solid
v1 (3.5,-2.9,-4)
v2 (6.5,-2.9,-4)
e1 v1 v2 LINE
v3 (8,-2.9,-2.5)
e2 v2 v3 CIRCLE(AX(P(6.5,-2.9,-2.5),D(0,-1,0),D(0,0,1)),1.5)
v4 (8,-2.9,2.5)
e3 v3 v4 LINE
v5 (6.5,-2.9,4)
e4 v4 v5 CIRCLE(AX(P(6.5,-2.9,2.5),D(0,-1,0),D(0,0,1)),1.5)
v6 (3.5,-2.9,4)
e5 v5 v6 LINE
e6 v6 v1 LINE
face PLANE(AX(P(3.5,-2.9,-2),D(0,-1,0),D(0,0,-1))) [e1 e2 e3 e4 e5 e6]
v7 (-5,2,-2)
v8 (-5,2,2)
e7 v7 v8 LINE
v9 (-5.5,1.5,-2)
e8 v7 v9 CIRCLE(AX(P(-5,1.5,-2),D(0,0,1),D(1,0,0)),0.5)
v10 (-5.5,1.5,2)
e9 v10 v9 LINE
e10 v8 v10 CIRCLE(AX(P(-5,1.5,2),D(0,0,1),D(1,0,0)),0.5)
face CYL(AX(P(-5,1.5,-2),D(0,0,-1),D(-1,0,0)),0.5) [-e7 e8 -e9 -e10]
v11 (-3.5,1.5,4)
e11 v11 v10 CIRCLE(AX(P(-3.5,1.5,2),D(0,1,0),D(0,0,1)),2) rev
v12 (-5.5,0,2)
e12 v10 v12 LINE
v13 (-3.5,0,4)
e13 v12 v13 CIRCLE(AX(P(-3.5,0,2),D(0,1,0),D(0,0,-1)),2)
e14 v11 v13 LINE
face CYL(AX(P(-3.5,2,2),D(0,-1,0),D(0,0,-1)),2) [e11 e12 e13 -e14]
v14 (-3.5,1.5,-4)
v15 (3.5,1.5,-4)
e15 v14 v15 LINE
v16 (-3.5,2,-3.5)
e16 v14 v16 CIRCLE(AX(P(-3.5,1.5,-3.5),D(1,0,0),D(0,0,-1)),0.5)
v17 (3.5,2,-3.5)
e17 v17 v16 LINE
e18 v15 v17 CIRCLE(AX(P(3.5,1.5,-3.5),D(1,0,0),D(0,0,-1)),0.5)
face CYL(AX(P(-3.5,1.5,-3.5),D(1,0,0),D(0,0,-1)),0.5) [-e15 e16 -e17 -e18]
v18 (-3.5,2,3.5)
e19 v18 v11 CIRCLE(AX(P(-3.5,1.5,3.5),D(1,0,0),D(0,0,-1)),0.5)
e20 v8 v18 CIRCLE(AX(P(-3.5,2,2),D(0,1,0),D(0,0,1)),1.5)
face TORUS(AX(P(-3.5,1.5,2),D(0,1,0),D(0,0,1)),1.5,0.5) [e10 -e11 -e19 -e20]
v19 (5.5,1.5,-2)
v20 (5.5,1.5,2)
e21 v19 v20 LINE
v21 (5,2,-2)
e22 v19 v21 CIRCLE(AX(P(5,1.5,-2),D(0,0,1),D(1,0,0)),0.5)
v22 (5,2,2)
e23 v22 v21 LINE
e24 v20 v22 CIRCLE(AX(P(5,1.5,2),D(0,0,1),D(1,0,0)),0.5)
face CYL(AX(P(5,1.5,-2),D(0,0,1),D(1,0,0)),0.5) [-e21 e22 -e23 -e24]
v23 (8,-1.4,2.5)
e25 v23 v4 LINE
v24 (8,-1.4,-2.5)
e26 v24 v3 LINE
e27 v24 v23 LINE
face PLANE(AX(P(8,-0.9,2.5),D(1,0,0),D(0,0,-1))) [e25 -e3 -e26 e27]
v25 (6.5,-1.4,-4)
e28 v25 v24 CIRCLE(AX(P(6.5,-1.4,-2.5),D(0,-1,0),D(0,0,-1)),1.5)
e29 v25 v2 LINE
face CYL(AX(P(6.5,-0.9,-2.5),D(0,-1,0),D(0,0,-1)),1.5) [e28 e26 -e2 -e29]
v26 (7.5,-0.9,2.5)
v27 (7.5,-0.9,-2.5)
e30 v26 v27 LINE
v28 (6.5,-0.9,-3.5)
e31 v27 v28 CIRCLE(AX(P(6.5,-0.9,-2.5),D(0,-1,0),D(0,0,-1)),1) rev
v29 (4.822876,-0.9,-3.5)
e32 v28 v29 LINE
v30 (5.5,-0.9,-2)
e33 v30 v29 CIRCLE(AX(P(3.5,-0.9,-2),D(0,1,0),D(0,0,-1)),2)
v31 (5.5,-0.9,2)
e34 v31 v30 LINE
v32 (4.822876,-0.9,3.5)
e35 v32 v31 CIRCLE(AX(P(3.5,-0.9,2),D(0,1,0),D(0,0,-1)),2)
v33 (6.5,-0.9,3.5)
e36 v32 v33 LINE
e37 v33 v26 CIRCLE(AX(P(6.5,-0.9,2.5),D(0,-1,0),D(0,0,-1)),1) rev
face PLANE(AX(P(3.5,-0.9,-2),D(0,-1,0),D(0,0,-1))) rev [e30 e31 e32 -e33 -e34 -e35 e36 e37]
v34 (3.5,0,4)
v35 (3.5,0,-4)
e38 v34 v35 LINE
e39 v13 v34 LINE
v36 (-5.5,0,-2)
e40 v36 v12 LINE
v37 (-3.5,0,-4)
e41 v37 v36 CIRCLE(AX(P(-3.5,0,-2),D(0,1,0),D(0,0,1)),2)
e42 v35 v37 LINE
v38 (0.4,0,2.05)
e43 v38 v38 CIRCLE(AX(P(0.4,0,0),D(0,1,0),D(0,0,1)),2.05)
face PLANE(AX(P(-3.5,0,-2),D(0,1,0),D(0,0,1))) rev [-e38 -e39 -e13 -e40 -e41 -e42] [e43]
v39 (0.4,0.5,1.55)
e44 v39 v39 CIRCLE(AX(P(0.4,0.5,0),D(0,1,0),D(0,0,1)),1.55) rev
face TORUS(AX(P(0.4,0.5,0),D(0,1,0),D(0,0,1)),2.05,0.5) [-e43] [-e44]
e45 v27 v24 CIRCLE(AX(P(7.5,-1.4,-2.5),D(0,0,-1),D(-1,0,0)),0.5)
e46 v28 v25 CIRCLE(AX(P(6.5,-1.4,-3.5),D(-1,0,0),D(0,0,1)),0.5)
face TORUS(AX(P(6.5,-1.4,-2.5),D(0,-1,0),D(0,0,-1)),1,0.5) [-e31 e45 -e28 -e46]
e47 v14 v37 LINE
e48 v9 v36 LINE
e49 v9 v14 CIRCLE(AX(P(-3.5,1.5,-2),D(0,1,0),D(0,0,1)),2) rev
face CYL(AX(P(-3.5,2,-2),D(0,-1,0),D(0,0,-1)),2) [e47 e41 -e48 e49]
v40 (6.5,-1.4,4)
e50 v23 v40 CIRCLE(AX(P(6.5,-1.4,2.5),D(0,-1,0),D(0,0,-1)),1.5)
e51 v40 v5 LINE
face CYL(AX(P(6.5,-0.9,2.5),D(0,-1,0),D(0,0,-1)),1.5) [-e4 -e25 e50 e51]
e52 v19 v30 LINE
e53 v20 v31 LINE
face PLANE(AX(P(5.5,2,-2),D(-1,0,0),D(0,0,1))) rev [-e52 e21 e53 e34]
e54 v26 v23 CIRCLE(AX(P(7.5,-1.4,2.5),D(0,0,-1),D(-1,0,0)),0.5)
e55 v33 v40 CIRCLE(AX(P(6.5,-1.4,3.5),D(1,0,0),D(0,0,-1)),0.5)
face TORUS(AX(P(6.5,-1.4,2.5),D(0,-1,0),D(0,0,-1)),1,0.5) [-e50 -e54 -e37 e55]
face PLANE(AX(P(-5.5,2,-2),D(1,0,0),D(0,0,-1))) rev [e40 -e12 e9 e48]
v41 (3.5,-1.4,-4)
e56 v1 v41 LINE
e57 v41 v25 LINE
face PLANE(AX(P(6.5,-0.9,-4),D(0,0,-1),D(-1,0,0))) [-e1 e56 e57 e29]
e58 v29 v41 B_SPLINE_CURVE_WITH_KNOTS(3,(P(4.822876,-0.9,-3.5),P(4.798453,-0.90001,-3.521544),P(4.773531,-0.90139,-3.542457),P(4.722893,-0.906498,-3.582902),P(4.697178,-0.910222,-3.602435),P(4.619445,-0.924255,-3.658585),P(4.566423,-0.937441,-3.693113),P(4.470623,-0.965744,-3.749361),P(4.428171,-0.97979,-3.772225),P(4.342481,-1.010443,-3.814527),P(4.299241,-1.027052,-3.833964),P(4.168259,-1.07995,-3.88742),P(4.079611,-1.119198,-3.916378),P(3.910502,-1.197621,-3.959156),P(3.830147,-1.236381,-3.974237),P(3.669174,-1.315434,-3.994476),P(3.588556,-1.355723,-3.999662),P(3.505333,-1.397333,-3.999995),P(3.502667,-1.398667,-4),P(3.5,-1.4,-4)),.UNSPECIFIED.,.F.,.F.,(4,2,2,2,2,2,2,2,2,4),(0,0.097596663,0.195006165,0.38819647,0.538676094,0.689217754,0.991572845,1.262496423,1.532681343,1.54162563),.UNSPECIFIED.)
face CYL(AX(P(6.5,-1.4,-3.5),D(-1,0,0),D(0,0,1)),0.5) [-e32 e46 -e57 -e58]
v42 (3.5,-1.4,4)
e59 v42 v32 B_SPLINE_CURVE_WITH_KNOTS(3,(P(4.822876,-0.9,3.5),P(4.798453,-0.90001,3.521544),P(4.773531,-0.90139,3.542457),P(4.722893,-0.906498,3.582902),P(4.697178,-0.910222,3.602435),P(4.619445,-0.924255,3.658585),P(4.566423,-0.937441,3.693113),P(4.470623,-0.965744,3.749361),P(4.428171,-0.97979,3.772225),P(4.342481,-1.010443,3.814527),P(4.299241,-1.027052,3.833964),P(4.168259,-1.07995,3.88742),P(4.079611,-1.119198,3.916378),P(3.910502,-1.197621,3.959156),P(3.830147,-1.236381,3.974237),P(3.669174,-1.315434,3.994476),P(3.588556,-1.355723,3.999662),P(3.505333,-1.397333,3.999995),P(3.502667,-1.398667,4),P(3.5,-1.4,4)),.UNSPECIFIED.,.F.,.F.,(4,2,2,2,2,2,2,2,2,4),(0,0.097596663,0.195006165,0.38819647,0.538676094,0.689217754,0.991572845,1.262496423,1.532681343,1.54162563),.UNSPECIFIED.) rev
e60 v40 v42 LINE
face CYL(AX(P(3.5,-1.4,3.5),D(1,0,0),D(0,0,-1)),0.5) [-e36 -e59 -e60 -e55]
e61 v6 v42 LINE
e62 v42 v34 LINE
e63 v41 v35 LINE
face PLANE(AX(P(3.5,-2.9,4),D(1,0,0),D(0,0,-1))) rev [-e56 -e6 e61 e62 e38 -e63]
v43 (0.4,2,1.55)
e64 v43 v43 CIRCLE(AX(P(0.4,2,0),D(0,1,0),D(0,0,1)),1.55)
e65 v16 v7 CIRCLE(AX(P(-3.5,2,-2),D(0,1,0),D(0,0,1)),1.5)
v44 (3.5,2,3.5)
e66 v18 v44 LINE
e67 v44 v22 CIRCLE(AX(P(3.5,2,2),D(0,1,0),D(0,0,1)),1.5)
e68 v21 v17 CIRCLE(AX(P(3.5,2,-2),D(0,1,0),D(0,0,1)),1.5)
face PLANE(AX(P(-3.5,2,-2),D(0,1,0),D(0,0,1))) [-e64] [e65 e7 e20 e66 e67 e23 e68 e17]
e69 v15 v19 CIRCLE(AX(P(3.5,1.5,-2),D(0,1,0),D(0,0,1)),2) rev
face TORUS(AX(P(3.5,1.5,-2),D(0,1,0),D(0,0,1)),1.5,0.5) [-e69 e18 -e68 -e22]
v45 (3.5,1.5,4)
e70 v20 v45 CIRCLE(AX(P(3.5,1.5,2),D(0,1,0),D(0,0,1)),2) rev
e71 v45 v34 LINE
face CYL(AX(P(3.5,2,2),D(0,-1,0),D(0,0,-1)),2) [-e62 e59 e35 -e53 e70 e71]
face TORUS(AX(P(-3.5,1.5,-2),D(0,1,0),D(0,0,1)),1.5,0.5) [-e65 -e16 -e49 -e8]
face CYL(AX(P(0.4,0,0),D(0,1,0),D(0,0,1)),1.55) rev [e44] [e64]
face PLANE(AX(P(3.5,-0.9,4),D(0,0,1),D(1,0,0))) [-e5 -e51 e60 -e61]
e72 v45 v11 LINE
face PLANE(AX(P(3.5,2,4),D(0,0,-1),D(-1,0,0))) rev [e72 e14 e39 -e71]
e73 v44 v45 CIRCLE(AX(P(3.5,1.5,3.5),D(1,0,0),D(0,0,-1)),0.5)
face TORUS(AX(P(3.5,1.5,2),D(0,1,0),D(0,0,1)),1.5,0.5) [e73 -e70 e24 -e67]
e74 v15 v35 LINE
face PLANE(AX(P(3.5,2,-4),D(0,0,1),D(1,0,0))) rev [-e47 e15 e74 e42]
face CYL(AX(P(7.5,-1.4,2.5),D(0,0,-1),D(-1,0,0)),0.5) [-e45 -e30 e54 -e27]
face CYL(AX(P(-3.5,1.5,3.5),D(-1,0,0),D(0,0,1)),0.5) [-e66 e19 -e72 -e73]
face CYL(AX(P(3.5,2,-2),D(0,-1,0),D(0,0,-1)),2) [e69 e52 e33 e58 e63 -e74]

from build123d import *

# Parameters (mm, degrees)
BOSS_EXTRUDE1_DEPTH     = 2
CUT_EXTRUDE1_DEPTH      = 8.088723439
CUT_EXTRUDE1_DEPTH_BACK = 8.088723439
SKETCH2_R               = 1.55
BOSS_EXTRUDE2_START     = 2.9
BOSS_EXTRUDE2_DEPTH     = 2.9
BOSS_EXTRUDE3_DEPTH     = 2
FILLET1_R               = 0.5


with BuildPart() as part:
    # Sketch1 → Boss-Extrude1 (new body)
    with BuildSketch(Plane(origin=(0, 0, 0), x_dir=(1, 0, 0), z_dir=(0, 1, 0))):
        with BuildLine():
            Line((3.5, 4), (-3.5, 4))
            ThreePointArc((-3.5, 4), (-4.914213562, 3.414213562), (-5.5, 2))
            Line((-5.5, 2), (-5.5, -2))
            ThreePointArc((-5.5, -2), (-4.914213562, -3.414213562), (-3.5, -4))
            Line((-3.5, -4), (3.5, -4))
            ThreePointArc((3.5, -4), (4.914213562, -3.414213562), (5.5, -2))
            Line((5.5, -2), (5.5, 2))
            ThreePointArc((5.5, 2), (4.914213562, 3.414213562), (3.5, 4))
        make_face()
    extrude(amount=BOSS_EXTRUDE1_DEPTH)

    # Sketch2 → Cut-Extrude1 (cut, two sides: drawn at the far end of the back side and taken through both)
    with BuildSketch(Plane(origin=(0, 2, 0), x_dir=(1, 0, 0), z_dir=(0, 1, 0)).offset(-CUT_EXTRUDE1_DEPTH_BACK)):
        with Locations(Location((0.4, 0, 0), (0, 0, 270))):
            Circle(SKETCH2_R)
    extrude(amount=CUT_EXTRUDE1_DEPTH + CUT_EXTRUDE1_DEPTH_BACK, mode=Mode.SUBTRACT)

    # Sketch3 → Boss-Extrude2 (add)
    with BuildSketch(Plane.XZ.offset(BOSS_EXTRUDE2_START)):
        with BuildLine():
            Line((5.5, 2), (5.5, -2))
            ThreePointArc((5.5, -2), (4.914213562, -3.414213562), (3.5, -4))
            Line((3.5, -4), (3.5, 4))
            ThreePointArc((3.5, 4), (4.914213562, 3.414213562), (5.5, 2))
        make_face()
    extrude(amount=-BOSS_EXTRUDE2_DEPTH)

    # Sketch4 → Boss-Extrude3 (add)
    with BuildSketch(Plane.XZ.offset(2.9)):
        with BuildLine():
            Line((5.5, 2), (5.5, -2))
            ThreePointArc((5.5, -2), (4.914213562, -3.414213562), (3.5, -4))
            Line((3.5, -4), (6.5, -4))
            ThreePointArc((6.5, -4), (7.560660172, -3.560660172), (8, -2.5))
            Line((8, -2.5), (8, 2.5))
            ThreePointArc((8, 2.5), (7.560660172, 3.560660172), (6.5, 4))
            Line((6.5, 4), (3.5, 4))
            ThreePointArc((3.5, 4), (4.914213562, 3.414213562), (5.5, 2))
        make_face()
    extrude(amount=-BOSS_EXTRUDE3_DEPTH)

    # Fillet1
    # the kernel refuses this fillet: 0.5 mm, written as the material it takes off along each edge
    with BuildSketch(Plane(origin=(-3.5, 2, 2), x_dir=(-1, 0, 0), z_dir=(0, 0, -1))) as fillet1_piece_1:
        with BuildLine():
            CenterArc((2 - FILLET1_R, -FILLET1_R), FILLET1_R, 0, 90)
            Line((2, -FILLET1_R), (2, 0))
            Line((2, 0), (2 - FILLET1_R, 0))
        make_face()
    revolve(axis=Axis((-3.5, 2, 2), (0, 1, 0)), revolution_arc=90, mode=Mode.SUBTRACT)
    with BuildSketch(Plane(origin=(-3.5, 2, 4), x_dir=(0, 0, -1), z_dir=(1, 0, 0)), Plane(origin=(3.5, 2, -4), x_dir=(0, 0, 1), z_dir=(-1, 0, 0))) as fillet1_piece_2:
        with BuildLine():
            CenterArc((FILLET1_R, -FILLET1_R), FILLET1_R, 90, 90)
            Line((0, -FILLET1_R), (0, 0))
            Line((0, 0), (FILLET1_R, 0))
        make_face()
    extrude(amount=7, mode=Mode.SUBTRACT)
    with BuildSketch(Plane(origin=(3.5, 2, 2), x_dir=(0, 0, 1), z_dir=(-1, 0, 0))) as fillet1_piece_3:
        with BuildLine():
            CenterArc((2 - FILLET1_R, -FILLET1_R), FILLET1_R, 0, 90)
            Line((2 - FILLET1_R, 0), (2, 0))
            Line((2, 0), (2, -FILLET1_R))
        make_face()
    revolve(axis=Axis((3.5, 2, 2), (0, 1, 0)), revolution_arc=90, mode=Mode.SUBTRACT)
    with BuildSketch(Plane(origin=(5.5, 2, 2), x_dir=(0, -1, 0), z_dir=(0, 0, -1))) as fillet1_piece_4:
        with BuildLine():
            CenterArc((FILLET1_R, FILLET1_R), FILLET1_R, 180, 90)
            Line((0, FILLET1_R), (0, 0))
            Line((0, 0), (FILLET1_R, 0))
        make_face()
    extrude(amount=4, mode=Mode.SUBTRACT)
    with BuildSketch(Plane(origin=(0.4, 0, 0), x_dir=(0, 0, 1), z_dir=(-1, 0, 0))) as fillet1_piece_5:
        with BuildLine():
            CenterArc((1.55 + FILLET1_R, FILLET1_R), FILLET1_R, 180, 90)
            Line((1.55 + FILLET1_R, 0), (1.55, 0))
            Line((1.55, 0), (1.55, FILLET1_R))
        make_face()
    revolve(axis=Axis((0.4, 0, 0), (0, 1, 0)), mode=Mode.SUBTRACT)
    with BuildSketch(Plane(origin=(3.5, 2, -2), x_dir=(1, 0, 0), z_dir=(0, 0, 1))) as fillet1_piece_6:
        with BuildLine():
            CenterArc((2 - FILLET1_R, -FILLET1_R), FILLET1_R, 0, 90)
            Line((2 - FILLET1_R, 0), (2, 0))
            Line((2, 0), (2, -FILLET1_R))
        make_face()
    revolve(axis=Axis((3.5, 2, -2), (0, 1, 0)), revolution_arc=90, mode=Mode.SUBTRACT)
    with BuildSketch(Plane(origin=(6.5, -0.9, 4), x_dir=(0, 0, -1), z_dir=(-1, 0, 0))) as fillet1_piece_7_section:
        with BuildLine():
            CenterArc((FILLET1_R, FILLET1_R), FILLET1_R, 180, 90)
            Line((0, FILLET1_R), (0, 0))
            Line((0, 0), (FILLET1_R, 0))
        make_face()
    fillet1_piece_7 = extrude(amount=4.25, mode=Mode.PRIVATE)
    fillet1_piece_7 = fillet1_piece_7 - Plane(origin=(3.5, -0.984531393, 2), x_dir=(0, 0, 1), z_dir=(0, -1, 0)) * Cylinder(2, 11, mode=Mode.PRIVATE)
    add(fillet1_piece_7, mode=Mode.SUBTRACT)
    with BuildSketch(Plane(origin=(6.5, -0.9, 2.5), x_dir=(1, 0, 0), z_dir=(0, 0, -1))) as fillet1_piece_8:
        with BuildLine():
            CenterArc((1.5 - FILLET1_R, FILLET1_R), FILLET1_R, 270, 90)
            Line((1.5, FILLET1_R), (1.5, 0))
            Line((1.5, 0), (1.5 - FILLET1_R, 0))
        make_face()
    revolve(axis=Axis((6.5, -0.9, 2.5), (0, -1, 0)), revolution_arc=90, mode=Mode.SUBTRACT)
    with BuildSketch(Plane(origin=(8, -0.9, -2.5), x_dir=(-1, 0, 0), z_dir=(0, 0, 1))) as fillet1_piece_9:
        with BuildLine():
            CenterArc((FILLET1_R, FILLET1_R), FILLET1_R, 180, 90)
            Line((0, FILLET1_R), (0, 0))
            Line((0, 0), (FILLET1_R, 0))
        make_face()
    extrude(amount=5, mode=Mode.SUBTRACT)
    with BuildSketch(Plane(origin=(6.5, -0.9, -2.5), x_dir=(0, 0, -1), z_dir=(-1, 0, 0))) as fillet1_piece_10:
        with BuildLine():
            CenterArc((1.5 - FILLET1_R, FILLET1_R), FILLET1_R, 270, 90)
            Line((1.5, FILLET1_R), (1.5, 0))
            Line((1.5, 0), (1.5 - FILLET1_R, 0))
        make_face()
    revolve(axis=Axis((6.5, -0.9, -2.5), (0, -1, 0)), revolution_arc=90, mode=Mode.SUBTRACT)
    with BuildSketch(Plane(origin=(2.25, -0.9, -4), x_dir=(0, 0, 1), z_dir=(1, 0, 0))) as fillet1_piece_11_section:
        with BuildLine():
            CenterArc((FILLET1_R, FILLET1_R), FILLET1_R, 180, 90)
            Line((0, FILLET1_R), (0, 0))
            Line((0, 0), (FILLET1_R, 0))
        make_face()
    fillet1_piece_11 = extrude(amount=4.25, mode=Mode.PRIVATE)
    fillet1_piece_11 = fillet1_piece_11 - Plane(origin=(3.5, -1.027464109, -2), x_dir=(1, 0, 0), z_dir=(0, -1, 0)) * Cylinder(2, 11, mode=Mode.PRIVATE)
    add(fillet1_piece_11, mode=Mode.SUBTRACT)
    with BuildSketch(Plane(origin=(-3.5, 2, -2), x_dir=(0, 0, -1), z_dir=(1, 0, 0))) as fillet1_piece_12:
        with BuildLine():
            CenterArc((2 - FILLET1_R, -FILLET1_R), FILLET1_R, 0, 90)
            Line((2, -FILLET1_R), (2, 0))
            Line((2, 0), (2 - FILLET1_R, 0))
        make_face()
    revolve(axis=Axis((-3.5, 2, -2), (0, 1, 0)), revolution_arc=90, mode=Mode.SUBTRACT)
    with BuildSketch(Plane(origin=(-5.5, 2, -2), x_dir=(1, 0, 0), z_dir=(0, 0, 1))) as fillet1_piece_13:
        with BuildLine():
            CenterArc((FILLET1_R, -FILLET1_R), FILLET1_R, 90, 90)
            Line((0, -FILLET1_R), (0, 0))
            Line((0, 0), (FILLET1_R, 0))
        make_face()
    extrude(amount=4, mode=Mode.SUBTRACT)


solid = part.part
